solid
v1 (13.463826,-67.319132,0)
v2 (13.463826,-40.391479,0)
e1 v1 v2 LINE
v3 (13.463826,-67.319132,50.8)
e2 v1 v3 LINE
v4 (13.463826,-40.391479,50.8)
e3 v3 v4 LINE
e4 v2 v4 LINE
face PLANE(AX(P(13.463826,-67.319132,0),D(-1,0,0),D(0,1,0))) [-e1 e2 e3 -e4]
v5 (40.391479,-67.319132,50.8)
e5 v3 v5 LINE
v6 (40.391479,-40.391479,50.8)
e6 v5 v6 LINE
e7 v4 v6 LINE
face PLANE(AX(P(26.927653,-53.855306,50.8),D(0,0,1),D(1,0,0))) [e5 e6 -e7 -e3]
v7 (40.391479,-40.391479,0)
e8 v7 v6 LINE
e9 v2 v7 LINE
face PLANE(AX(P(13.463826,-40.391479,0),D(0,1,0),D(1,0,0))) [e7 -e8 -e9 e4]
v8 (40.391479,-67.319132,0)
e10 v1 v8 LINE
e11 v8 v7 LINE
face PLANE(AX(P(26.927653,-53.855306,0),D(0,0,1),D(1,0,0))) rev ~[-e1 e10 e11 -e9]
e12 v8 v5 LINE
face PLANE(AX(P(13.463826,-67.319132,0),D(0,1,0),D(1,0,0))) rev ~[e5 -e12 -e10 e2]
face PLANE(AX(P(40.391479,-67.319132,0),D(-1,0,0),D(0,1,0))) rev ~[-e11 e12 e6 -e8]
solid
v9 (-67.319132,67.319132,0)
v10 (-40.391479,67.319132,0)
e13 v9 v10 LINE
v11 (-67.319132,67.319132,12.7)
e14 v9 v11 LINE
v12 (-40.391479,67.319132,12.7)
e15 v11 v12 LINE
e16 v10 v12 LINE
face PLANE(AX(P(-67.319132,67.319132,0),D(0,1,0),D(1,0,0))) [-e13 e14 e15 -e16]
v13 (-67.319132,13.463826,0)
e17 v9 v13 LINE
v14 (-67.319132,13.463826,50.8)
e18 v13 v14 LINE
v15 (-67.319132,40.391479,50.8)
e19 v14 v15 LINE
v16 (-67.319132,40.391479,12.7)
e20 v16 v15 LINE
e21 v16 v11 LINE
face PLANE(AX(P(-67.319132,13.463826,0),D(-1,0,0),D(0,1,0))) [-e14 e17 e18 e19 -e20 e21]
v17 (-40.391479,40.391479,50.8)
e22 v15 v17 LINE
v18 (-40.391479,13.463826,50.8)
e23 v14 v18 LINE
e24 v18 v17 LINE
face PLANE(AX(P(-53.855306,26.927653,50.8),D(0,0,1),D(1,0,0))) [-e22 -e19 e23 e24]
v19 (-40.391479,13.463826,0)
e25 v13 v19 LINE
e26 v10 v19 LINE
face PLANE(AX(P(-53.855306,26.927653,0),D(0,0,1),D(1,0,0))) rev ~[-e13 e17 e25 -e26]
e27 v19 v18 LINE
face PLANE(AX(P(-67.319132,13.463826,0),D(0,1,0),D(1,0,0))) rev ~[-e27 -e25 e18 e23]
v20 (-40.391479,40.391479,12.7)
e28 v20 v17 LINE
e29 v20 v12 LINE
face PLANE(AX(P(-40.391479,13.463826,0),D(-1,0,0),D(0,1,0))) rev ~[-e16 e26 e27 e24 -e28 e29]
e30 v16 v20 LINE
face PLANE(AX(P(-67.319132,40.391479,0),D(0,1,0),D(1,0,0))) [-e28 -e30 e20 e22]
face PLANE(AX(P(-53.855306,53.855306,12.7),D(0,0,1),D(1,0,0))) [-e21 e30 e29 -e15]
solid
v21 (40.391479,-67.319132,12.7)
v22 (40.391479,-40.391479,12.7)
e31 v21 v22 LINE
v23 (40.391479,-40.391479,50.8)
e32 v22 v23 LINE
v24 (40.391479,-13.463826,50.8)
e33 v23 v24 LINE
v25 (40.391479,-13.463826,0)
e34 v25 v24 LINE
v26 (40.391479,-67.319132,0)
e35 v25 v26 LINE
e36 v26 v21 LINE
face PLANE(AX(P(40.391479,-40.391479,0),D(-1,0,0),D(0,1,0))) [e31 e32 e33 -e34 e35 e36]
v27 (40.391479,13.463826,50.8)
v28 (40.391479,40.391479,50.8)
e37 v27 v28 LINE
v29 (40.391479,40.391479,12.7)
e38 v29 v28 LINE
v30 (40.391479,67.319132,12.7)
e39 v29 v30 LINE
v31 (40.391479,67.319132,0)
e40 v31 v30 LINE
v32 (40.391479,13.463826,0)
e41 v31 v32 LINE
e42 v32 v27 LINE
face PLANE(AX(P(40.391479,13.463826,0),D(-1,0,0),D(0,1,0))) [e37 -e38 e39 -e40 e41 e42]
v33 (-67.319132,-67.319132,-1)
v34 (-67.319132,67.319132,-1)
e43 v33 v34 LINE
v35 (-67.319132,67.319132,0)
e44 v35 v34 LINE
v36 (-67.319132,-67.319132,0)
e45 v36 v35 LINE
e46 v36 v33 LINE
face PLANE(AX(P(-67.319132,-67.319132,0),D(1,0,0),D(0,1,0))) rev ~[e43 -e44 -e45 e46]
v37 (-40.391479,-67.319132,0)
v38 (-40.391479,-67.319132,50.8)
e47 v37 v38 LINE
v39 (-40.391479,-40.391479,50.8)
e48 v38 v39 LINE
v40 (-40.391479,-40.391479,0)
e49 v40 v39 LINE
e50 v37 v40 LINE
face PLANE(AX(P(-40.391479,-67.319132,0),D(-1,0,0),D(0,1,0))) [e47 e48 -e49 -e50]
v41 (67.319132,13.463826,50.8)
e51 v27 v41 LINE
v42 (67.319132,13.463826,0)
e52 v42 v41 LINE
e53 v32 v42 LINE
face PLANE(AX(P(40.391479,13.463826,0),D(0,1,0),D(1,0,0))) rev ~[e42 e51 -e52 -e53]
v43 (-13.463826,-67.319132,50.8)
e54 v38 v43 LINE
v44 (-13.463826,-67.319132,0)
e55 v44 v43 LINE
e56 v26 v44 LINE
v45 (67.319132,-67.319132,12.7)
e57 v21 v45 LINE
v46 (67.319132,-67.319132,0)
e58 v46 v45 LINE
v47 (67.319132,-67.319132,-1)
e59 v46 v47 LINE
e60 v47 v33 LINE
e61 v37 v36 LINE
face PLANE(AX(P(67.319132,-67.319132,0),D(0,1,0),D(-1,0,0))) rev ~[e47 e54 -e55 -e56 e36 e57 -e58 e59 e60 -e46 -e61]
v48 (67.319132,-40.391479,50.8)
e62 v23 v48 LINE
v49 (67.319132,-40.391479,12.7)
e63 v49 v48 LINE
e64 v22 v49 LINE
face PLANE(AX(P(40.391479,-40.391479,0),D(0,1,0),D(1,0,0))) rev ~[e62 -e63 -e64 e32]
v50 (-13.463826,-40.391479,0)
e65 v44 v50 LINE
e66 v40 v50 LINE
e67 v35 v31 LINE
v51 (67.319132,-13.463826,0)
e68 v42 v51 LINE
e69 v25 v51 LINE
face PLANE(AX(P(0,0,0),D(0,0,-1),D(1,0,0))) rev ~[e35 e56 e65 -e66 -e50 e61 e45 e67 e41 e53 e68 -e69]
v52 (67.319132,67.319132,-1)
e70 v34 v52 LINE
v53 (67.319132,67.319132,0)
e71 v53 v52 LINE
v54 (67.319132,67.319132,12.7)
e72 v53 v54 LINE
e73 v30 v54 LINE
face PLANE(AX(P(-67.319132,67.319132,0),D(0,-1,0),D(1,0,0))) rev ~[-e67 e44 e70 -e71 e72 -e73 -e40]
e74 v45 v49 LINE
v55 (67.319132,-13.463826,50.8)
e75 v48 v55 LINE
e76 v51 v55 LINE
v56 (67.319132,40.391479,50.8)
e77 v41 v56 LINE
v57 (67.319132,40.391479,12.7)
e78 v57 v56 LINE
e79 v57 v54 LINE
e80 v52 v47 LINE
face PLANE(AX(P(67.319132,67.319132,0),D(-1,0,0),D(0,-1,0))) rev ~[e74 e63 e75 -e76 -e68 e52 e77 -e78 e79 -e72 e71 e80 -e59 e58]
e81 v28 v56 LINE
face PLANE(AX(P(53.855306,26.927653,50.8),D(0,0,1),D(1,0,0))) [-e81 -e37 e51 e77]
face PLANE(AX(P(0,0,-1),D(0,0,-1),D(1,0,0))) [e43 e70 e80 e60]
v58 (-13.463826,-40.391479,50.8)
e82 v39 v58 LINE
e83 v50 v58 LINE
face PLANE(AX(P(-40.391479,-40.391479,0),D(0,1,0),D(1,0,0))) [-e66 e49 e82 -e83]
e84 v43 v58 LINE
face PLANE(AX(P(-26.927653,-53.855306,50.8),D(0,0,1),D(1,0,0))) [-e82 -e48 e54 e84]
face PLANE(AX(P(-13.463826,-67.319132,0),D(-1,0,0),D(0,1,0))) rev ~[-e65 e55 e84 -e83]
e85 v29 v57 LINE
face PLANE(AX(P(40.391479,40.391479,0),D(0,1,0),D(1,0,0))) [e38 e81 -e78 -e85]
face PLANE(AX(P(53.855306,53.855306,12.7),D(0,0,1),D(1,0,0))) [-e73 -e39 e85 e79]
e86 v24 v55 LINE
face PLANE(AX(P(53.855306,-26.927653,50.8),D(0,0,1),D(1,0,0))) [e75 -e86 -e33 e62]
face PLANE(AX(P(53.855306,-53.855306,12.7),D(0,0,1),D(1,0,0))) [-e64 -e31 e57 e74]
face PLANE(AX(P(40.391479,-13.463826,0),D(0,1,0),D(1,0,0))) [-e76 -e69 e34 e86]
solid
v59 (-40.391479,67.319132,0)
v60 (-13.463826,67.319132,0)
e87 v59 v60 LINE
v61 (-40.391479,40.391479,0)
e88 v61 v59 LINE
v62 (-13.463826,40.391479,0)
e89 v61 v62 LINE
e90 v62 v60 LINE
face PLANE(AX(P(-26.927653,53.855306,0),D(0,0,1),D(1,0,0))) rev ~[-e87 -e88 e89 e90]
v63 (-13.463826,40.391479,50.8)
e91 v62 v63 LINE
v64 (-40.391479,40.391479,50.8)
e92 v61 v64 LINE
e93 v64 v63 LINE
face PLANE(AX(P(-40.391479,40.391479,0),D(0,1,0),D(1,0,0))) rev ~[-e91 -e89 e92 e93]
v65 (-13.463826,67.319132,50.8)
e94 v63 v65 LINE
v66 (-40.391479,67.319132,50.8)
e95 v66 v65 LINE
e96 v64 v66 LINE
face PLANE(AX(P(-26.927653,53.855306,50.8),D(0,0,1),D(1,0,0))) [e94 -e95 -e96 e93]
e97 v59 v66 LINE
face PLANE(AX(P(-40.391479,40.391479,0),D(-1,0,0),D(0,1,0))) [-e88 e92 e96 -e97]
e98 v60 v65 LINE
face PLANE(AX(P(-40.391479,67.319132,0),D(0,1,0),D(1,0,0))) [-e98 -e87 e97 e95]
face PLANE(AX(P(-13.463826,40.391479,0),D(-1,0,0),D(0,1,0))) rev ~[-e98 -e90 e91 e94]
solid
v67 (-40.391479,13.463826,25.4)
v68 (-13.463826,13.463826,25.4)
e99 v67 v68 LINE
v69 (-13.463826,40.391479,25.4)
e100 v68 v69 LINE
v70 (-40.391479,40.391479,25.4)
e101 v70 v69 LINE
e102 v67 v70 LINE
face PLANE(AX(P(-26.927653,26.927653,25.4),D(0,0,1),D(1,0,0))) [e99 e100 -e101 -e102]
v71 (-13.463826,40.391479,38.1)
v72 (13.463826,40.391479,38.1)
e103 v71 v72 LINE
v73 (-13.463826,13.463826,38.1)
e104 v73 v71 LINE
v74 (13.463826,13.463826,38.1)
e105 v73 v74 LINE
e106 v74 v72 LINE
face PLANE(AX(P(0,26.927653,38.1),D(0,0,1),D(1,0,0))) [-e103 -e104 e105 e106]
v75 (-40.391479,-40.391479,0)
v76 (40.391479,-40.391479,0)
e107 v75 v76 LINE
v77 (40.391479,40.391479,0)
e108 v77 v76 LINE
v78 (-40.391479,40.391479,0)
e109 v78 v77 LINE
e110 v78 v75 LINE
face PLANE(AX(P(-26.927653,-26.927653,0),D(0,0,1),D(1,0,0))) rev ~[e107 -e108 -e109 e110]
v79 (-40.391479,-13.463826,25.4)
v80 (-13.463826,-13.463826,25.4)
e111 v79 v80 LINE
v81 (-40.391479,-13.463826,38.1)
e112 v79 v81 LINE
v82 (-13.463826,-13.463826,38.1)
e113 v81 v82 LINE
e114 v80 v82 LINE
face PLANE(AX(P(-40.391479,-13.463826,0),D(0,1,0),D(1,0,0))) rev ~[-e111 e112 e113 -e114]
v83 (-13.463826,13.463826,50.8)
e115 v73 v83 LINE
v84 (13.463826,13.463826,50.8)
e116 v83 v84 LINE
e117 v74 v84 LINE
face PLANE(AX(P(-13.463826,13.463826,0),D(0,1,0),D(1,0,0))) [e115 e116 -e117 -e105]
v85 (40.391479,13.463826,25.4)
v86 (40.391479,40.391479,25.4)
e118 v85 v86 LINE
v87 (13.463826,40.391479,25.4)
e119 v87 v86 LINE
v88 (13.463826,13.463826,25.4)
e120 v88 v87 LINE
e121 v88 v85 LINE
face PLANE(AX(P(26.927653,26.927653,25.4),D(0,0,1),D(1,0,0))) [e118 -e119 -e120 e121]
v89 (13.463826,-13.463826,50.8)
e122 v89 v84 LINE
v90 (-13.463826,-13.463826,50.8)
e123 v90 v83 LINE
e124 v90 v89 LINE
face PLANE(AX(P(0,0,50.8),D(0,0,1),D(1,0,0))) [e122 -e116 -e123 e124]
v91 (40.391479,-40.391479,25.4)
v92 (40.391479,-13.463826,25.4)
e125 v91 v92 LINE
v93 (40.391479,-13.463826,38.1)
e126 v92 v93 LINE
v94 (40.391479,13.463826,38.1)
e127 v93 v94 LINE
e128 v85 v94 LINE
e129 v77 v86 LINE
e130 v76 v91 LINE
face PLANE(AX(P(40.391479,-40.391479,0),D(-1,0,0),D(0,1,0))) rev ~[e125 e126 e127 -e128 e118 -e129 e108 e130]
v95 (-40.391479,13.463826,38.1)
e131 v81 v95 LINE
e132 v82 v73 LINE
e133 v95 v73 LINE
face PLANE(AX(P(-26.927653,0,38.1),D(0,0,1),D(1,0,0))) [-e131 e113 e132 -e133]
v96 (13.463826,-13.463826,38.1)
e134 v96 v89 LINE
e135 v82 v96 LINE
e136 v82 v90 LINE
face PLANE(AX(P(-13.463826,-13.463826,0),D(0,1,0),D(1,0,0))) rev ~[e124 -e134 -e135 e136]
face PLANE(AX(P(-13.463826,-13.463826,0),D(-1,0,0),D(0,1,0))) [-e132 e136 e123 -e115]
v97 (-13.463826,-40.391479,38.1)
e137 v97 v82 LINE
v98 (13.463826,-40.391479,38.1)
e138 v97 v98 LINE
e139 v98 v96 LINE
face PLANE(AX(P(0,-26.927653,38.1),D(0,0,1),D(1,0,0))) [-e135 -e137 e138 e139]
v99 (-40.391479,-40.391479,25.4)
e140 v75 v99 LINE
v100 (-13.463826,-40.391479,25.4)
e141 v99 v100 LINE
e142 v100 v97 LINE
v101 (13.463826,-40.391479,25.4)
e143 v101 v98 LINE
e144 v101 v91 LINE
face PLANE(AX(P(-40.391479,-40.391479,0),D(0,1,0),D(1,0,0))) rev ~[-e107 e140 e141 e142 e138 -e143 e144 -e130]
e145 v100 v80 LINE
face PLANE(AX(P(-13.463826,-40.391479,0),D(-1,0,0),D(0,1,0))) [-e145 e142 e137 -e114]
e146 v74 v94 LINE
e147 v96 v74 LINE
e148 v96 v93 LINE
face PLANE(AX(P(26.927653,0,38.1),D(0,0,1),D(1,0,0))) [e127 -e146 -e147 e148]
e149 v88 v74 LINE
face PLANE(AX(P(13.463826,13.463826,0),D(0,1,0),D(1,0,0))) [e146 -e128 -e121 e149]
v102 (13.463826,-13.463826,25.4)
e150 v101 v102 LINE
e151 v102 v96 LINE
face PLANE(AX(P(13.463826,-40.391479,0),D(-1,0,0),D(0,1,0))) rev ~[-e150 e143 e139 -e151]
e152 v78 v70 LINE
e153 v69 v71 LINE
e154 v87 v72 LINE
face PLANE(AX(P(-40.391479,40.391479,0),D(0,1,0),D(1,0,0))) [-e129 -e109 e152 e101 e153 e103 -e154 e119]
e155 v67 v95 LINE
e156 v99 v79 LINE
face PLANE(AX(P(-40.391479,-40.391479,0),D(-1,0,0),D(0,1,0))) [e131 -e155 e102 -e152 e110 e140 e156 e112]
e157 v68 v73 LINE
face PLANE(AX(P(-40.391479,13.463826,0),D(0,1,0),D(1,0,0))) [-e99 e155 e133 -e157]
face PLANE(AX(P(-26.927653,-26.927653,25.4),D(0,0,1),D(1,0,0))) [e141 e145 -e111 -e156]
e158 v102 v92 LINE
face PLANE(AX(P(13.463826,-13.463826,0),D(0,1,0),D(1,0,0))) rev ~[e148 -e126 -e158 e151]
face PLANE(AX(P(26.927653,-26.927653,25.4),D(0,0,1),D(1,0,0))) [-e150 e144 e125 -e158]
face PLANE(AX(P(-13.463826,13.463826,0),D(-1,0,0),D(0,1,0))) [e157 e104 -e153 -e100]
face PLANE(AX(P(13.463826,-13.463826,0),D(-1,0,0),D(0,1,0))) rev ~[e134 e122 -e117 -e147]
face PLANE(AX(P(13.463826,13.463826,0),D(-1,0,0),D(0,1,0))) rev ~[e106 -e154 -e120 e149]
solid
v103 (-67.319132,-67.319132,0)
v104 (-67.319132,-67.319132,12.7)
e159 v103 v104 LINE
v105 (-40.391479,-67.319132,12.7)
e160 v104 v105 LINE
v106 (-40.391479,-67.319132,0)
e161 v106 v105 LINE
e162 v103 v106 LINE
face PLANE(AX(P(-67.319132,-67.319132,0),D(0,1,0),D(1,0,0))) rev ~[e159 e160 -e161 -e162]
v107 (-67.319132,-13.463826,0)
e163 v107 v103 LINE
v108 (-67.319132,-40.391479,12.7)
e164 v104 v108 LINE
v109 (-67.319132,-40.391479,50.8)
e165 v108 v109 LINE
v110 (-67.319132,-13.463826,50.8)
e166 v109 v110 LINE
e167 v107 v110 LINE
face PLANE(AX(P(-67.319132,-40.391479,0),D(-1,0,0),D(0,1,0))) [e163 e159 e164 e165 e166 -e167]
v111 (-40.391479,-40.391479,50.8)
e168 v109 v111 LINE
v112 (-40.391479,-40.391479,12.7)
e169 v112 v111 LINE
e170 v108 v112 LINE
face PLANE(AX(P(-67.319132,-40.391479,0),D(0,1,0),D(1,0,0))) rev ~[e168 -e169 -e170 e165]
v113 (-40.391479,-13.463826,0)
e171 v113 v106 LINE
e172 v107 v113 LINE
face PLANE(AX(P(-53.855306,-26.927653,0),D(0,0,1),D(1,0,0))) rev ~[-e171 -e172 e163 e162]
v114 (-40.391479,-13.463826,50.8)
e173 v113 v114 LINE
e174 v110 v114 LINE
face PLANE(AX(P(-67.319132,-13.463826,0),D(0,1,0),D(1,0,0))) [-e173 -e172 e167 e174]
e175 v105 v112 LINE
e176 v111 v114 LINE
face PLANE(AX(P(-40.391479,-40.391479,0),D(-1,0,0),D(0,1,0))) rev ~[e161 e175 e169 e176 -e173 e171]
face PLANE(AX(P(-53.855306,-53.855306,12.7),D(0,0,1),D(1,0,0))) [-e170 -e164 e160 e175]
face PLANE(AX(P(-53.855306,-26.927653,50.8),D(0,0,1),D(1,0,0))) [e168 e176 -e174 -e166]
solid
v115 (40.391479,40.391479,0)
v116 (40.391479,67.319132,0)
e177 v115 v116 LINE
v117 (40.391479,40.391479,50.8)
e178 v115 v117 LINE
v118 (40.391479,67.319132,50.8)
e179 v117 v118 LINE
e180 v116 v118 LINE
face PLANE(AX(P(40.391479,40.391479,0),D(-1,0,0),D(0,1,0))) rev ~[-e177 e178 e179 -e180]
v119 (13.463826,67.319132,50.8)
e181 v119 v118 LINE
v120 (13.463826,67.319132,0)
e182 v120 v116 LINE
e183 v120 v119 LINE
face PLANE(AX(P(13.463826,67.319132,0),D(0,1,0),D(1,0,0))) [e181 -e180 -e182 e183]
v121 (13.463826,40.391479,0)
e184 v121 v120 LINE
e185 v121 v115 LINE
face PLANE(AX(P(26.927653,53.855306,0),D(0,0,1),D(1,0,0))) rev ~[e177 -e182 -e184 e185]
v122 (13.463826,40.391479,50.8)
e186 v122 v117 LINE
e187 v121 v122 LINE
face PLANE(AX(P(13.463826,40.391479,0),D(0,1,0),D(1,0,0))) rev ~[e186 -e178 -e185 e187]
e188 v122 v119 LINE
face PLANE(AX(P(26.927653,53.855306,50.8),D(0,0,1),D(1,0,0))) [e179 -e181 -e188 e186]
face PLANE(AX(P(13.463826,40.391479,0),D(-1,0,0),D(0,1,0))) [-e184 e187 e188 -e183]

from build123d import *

# Parameters (mm, degrees)
F0_W     = 26.9276529551
F0_H     = 26.9276529551
F1_DEPTH = 38.1
F2_DEPTH = 25.4
F3_DEPTH = 12.7
F4_DEPTH = 50.8
F8_DEPTH = 1


with BuildPart() as f1:
    # F0 (on Top) → F1 (new body)
    with BuildSketch(Plane.XY):
        with Locations((-26.9276529551, 0)):
            Rectangle(F0_W, F0_H)
    extrude(amount=F1_DEPTH)



with BuildPart() as f1b:
    # F0 (on Top) → F1, piece 2 (new body)
    with BuildSketch(Plane.XY):
        with Locations((0, 26.9276529551)):
            Rectangle(F0_W, F0_H)
    extrude(amount=F1_DEPTH)


with BuildPart() as f1c:
    # F0 (on Top) → F1, piece 3 (new body)
    with BuildSketch(Plane.XY):
        with Locations((26.9276529551, 0)):
            Rectangle(F0_W, F0_H)
    extrude(amount=F1_DEPTH)


with BuildPart() as f1d:
    # F0 (on Top) → F1, piece 4 (new body)
    with BuildSketch(Plane.XY):
        with Locations((0, -26.9276529551)):
            Rectangle(F0_W, F0_H)
    extrude(amount=F1_DEPTH)


with BuildPart() as f1_1:
    add(f1.part)

    add(f1b.part)  # F2 merges F1b

    add(f1c.part)  # F2 merges F1c

    add(f1d.part)  # F2 merges F1d
    # F0 (on Top) → F2 (join)
    with BuildSketch(Plane.XY):
        with Locations((-26.9276529551, -26.9276529551)):
            Rectangle(F0_W, F0_H)
        with Locations((-26.9276529551, 26.9276529551)):
            Rectangle(F0_W, F0_H)
        with Locations((26.9276529551, 26.9276529551)):
            Rectangle(F0_W, F0_H)
        with Locations((26.9276529551, -26.9276529551)):
            Rectangle(F0_W, F0_H)
    extrude(amount=F2_DEPTH)

    # F0 (on Top) → F4, piece 9 (join)
    with BuildSketch(Plane.XY):
        Rectangle(F0_W, F0_H)
    extrude(amount=F4_DEPTH)


with BuildPart() as f3:
    # F0 (on Top) → F3 (new body)
    with BuildSketch(Plane.XY):
        with Locations((-53.8553059101, 53.8553059101)):
            Rectangle(F0_W, F0_H)
    extrude(amount=F3_DEPTH)

    # F0 (on Top) → F4 (join)
    with BuildSketch(Plane.XY):
        with Locations((-53.8553059101, 26.9276529551)):
            Rectangle(F0_W, F0_H)
    extrude(amount=F4_DEPTH)


with BuildPart() as f3b:
    # F0 (on Top) → F3, piece 2 (new body)
    with BuildSketch(Plane.XY):
        with Locations((-53.8553059101, -53.8553059101)):
            Rectangle(F0_W, F0_H)
    extrude(amount=F3_DEPTH)

    # F0 (on Top) → F4, piece 8 (join)
    with BuildSketch(Plane.XY):
        with Locations((-53.8553059101, -26.9276529551)):
            Rectangle(F0_W, F0_H)
    extrude(amount=F4_DEPTH)

    # F5: union 


with BuildPart() as f3c:
    # F0 (on Top) → F3, piece 3 (new body)
    with BuildSketch(Plane.XY):
        with Locations((53.8553059101, 53.8553059101)):
            Rectangle(F0_W, F0_H)
    extrude(amount=F3_DEPTH)

    # F0 (on Top) → F4, piece 4 (join)
    with BuildSketch(Plane.XY):
        with Locations((53.8553059101, 26.9276529551)):
            Rectangle(F0_W, F0_H)
    extrude(amount=F4_DEPTH)

    # F6: union 



with BuildPart() as f3d:
    # F0 (on Top) → F3, piece 4 (new body)
    with BuildSketch(Plane.XY):
        with Locations((53.8553059101, -53.8553059101)):
            Rectangle(F0_W, F0_H)
    extrude(amount=F3_DEPTH)

    # F0 (on Top) → F4, piece 5 (join)
    with BuildSketch(Plane.XY):
        with Locations((53.8553059101, -26.9276529551)):
            Rectangle(F0_W, F0_H)
    extrude(amount=F4_DEPTH)


with BuildPart() as f4:
    # F0 (on Top) → F4, piece 2 (new body)
    with BuildSketch(Plane.XY):
        with Locations((-26.9276529551, 53.8553059101)):
            Rectangle(F0_W, F0_H)
    extrude(amount=F4_DEPTH)


with BuildPart() as f4b:
    # F0 (on Top) → F4, piece 3 (new body)
    with BuildSketch(Plane.XY):
        with Locations((26.9276529551, 53.8553059101)):
            Rectangle(F0_W, F0_H)
    extrude(amount=F4_DEPTH)


with BuildPart() as f4c:
    # F0 (on Top) → F4, piece 6 (new body)
    with BuildSketch(Plane.XY):
        with Locations((26.9276529551, -53.8553059101)):
            Rectangle(F0_W, F0_H)
    extrude(amount=F4_DEPTH)


with BuildPart() as f4d:
    # F0 (on Top) → F4, piece 7 (new body)
    with BuildSketch(Plane.XY):
        with Locations((-26.9276529551, -53.8553059101)):
            Rectangle(F0_W, F0_H)
    extrude(amount=F4_DEPTH)


with BuildPart() as f3c_1:
    add(f3c.part)

    add(f3d.part)  # F8 merges F3d

    add(f4d.part)  # F8 merges F4d
    # F7 (on face) → F8 (join)
    with BuildSketch(Plane(origin=(0, 0, 0), x_dir=(1, 0, 0), z_dir=(0, 0, -1))):
        Polygon((-67.3191323876, -67.3191323876), (67.3191323876, -67.3191323876), (67.3191323876, -13.4638264775), (67.3191323876, 67.3191323876), (-67.3191323876, 67.3191323876), (-67.3191323876, 13.4638264775), align=None)
    extrude(amount=F8_DEPTH)


solid = Compound([f1_1.part, f3.part, f3b.part, f4.part, f4b.part, f4c.part, f3c_1.part])
